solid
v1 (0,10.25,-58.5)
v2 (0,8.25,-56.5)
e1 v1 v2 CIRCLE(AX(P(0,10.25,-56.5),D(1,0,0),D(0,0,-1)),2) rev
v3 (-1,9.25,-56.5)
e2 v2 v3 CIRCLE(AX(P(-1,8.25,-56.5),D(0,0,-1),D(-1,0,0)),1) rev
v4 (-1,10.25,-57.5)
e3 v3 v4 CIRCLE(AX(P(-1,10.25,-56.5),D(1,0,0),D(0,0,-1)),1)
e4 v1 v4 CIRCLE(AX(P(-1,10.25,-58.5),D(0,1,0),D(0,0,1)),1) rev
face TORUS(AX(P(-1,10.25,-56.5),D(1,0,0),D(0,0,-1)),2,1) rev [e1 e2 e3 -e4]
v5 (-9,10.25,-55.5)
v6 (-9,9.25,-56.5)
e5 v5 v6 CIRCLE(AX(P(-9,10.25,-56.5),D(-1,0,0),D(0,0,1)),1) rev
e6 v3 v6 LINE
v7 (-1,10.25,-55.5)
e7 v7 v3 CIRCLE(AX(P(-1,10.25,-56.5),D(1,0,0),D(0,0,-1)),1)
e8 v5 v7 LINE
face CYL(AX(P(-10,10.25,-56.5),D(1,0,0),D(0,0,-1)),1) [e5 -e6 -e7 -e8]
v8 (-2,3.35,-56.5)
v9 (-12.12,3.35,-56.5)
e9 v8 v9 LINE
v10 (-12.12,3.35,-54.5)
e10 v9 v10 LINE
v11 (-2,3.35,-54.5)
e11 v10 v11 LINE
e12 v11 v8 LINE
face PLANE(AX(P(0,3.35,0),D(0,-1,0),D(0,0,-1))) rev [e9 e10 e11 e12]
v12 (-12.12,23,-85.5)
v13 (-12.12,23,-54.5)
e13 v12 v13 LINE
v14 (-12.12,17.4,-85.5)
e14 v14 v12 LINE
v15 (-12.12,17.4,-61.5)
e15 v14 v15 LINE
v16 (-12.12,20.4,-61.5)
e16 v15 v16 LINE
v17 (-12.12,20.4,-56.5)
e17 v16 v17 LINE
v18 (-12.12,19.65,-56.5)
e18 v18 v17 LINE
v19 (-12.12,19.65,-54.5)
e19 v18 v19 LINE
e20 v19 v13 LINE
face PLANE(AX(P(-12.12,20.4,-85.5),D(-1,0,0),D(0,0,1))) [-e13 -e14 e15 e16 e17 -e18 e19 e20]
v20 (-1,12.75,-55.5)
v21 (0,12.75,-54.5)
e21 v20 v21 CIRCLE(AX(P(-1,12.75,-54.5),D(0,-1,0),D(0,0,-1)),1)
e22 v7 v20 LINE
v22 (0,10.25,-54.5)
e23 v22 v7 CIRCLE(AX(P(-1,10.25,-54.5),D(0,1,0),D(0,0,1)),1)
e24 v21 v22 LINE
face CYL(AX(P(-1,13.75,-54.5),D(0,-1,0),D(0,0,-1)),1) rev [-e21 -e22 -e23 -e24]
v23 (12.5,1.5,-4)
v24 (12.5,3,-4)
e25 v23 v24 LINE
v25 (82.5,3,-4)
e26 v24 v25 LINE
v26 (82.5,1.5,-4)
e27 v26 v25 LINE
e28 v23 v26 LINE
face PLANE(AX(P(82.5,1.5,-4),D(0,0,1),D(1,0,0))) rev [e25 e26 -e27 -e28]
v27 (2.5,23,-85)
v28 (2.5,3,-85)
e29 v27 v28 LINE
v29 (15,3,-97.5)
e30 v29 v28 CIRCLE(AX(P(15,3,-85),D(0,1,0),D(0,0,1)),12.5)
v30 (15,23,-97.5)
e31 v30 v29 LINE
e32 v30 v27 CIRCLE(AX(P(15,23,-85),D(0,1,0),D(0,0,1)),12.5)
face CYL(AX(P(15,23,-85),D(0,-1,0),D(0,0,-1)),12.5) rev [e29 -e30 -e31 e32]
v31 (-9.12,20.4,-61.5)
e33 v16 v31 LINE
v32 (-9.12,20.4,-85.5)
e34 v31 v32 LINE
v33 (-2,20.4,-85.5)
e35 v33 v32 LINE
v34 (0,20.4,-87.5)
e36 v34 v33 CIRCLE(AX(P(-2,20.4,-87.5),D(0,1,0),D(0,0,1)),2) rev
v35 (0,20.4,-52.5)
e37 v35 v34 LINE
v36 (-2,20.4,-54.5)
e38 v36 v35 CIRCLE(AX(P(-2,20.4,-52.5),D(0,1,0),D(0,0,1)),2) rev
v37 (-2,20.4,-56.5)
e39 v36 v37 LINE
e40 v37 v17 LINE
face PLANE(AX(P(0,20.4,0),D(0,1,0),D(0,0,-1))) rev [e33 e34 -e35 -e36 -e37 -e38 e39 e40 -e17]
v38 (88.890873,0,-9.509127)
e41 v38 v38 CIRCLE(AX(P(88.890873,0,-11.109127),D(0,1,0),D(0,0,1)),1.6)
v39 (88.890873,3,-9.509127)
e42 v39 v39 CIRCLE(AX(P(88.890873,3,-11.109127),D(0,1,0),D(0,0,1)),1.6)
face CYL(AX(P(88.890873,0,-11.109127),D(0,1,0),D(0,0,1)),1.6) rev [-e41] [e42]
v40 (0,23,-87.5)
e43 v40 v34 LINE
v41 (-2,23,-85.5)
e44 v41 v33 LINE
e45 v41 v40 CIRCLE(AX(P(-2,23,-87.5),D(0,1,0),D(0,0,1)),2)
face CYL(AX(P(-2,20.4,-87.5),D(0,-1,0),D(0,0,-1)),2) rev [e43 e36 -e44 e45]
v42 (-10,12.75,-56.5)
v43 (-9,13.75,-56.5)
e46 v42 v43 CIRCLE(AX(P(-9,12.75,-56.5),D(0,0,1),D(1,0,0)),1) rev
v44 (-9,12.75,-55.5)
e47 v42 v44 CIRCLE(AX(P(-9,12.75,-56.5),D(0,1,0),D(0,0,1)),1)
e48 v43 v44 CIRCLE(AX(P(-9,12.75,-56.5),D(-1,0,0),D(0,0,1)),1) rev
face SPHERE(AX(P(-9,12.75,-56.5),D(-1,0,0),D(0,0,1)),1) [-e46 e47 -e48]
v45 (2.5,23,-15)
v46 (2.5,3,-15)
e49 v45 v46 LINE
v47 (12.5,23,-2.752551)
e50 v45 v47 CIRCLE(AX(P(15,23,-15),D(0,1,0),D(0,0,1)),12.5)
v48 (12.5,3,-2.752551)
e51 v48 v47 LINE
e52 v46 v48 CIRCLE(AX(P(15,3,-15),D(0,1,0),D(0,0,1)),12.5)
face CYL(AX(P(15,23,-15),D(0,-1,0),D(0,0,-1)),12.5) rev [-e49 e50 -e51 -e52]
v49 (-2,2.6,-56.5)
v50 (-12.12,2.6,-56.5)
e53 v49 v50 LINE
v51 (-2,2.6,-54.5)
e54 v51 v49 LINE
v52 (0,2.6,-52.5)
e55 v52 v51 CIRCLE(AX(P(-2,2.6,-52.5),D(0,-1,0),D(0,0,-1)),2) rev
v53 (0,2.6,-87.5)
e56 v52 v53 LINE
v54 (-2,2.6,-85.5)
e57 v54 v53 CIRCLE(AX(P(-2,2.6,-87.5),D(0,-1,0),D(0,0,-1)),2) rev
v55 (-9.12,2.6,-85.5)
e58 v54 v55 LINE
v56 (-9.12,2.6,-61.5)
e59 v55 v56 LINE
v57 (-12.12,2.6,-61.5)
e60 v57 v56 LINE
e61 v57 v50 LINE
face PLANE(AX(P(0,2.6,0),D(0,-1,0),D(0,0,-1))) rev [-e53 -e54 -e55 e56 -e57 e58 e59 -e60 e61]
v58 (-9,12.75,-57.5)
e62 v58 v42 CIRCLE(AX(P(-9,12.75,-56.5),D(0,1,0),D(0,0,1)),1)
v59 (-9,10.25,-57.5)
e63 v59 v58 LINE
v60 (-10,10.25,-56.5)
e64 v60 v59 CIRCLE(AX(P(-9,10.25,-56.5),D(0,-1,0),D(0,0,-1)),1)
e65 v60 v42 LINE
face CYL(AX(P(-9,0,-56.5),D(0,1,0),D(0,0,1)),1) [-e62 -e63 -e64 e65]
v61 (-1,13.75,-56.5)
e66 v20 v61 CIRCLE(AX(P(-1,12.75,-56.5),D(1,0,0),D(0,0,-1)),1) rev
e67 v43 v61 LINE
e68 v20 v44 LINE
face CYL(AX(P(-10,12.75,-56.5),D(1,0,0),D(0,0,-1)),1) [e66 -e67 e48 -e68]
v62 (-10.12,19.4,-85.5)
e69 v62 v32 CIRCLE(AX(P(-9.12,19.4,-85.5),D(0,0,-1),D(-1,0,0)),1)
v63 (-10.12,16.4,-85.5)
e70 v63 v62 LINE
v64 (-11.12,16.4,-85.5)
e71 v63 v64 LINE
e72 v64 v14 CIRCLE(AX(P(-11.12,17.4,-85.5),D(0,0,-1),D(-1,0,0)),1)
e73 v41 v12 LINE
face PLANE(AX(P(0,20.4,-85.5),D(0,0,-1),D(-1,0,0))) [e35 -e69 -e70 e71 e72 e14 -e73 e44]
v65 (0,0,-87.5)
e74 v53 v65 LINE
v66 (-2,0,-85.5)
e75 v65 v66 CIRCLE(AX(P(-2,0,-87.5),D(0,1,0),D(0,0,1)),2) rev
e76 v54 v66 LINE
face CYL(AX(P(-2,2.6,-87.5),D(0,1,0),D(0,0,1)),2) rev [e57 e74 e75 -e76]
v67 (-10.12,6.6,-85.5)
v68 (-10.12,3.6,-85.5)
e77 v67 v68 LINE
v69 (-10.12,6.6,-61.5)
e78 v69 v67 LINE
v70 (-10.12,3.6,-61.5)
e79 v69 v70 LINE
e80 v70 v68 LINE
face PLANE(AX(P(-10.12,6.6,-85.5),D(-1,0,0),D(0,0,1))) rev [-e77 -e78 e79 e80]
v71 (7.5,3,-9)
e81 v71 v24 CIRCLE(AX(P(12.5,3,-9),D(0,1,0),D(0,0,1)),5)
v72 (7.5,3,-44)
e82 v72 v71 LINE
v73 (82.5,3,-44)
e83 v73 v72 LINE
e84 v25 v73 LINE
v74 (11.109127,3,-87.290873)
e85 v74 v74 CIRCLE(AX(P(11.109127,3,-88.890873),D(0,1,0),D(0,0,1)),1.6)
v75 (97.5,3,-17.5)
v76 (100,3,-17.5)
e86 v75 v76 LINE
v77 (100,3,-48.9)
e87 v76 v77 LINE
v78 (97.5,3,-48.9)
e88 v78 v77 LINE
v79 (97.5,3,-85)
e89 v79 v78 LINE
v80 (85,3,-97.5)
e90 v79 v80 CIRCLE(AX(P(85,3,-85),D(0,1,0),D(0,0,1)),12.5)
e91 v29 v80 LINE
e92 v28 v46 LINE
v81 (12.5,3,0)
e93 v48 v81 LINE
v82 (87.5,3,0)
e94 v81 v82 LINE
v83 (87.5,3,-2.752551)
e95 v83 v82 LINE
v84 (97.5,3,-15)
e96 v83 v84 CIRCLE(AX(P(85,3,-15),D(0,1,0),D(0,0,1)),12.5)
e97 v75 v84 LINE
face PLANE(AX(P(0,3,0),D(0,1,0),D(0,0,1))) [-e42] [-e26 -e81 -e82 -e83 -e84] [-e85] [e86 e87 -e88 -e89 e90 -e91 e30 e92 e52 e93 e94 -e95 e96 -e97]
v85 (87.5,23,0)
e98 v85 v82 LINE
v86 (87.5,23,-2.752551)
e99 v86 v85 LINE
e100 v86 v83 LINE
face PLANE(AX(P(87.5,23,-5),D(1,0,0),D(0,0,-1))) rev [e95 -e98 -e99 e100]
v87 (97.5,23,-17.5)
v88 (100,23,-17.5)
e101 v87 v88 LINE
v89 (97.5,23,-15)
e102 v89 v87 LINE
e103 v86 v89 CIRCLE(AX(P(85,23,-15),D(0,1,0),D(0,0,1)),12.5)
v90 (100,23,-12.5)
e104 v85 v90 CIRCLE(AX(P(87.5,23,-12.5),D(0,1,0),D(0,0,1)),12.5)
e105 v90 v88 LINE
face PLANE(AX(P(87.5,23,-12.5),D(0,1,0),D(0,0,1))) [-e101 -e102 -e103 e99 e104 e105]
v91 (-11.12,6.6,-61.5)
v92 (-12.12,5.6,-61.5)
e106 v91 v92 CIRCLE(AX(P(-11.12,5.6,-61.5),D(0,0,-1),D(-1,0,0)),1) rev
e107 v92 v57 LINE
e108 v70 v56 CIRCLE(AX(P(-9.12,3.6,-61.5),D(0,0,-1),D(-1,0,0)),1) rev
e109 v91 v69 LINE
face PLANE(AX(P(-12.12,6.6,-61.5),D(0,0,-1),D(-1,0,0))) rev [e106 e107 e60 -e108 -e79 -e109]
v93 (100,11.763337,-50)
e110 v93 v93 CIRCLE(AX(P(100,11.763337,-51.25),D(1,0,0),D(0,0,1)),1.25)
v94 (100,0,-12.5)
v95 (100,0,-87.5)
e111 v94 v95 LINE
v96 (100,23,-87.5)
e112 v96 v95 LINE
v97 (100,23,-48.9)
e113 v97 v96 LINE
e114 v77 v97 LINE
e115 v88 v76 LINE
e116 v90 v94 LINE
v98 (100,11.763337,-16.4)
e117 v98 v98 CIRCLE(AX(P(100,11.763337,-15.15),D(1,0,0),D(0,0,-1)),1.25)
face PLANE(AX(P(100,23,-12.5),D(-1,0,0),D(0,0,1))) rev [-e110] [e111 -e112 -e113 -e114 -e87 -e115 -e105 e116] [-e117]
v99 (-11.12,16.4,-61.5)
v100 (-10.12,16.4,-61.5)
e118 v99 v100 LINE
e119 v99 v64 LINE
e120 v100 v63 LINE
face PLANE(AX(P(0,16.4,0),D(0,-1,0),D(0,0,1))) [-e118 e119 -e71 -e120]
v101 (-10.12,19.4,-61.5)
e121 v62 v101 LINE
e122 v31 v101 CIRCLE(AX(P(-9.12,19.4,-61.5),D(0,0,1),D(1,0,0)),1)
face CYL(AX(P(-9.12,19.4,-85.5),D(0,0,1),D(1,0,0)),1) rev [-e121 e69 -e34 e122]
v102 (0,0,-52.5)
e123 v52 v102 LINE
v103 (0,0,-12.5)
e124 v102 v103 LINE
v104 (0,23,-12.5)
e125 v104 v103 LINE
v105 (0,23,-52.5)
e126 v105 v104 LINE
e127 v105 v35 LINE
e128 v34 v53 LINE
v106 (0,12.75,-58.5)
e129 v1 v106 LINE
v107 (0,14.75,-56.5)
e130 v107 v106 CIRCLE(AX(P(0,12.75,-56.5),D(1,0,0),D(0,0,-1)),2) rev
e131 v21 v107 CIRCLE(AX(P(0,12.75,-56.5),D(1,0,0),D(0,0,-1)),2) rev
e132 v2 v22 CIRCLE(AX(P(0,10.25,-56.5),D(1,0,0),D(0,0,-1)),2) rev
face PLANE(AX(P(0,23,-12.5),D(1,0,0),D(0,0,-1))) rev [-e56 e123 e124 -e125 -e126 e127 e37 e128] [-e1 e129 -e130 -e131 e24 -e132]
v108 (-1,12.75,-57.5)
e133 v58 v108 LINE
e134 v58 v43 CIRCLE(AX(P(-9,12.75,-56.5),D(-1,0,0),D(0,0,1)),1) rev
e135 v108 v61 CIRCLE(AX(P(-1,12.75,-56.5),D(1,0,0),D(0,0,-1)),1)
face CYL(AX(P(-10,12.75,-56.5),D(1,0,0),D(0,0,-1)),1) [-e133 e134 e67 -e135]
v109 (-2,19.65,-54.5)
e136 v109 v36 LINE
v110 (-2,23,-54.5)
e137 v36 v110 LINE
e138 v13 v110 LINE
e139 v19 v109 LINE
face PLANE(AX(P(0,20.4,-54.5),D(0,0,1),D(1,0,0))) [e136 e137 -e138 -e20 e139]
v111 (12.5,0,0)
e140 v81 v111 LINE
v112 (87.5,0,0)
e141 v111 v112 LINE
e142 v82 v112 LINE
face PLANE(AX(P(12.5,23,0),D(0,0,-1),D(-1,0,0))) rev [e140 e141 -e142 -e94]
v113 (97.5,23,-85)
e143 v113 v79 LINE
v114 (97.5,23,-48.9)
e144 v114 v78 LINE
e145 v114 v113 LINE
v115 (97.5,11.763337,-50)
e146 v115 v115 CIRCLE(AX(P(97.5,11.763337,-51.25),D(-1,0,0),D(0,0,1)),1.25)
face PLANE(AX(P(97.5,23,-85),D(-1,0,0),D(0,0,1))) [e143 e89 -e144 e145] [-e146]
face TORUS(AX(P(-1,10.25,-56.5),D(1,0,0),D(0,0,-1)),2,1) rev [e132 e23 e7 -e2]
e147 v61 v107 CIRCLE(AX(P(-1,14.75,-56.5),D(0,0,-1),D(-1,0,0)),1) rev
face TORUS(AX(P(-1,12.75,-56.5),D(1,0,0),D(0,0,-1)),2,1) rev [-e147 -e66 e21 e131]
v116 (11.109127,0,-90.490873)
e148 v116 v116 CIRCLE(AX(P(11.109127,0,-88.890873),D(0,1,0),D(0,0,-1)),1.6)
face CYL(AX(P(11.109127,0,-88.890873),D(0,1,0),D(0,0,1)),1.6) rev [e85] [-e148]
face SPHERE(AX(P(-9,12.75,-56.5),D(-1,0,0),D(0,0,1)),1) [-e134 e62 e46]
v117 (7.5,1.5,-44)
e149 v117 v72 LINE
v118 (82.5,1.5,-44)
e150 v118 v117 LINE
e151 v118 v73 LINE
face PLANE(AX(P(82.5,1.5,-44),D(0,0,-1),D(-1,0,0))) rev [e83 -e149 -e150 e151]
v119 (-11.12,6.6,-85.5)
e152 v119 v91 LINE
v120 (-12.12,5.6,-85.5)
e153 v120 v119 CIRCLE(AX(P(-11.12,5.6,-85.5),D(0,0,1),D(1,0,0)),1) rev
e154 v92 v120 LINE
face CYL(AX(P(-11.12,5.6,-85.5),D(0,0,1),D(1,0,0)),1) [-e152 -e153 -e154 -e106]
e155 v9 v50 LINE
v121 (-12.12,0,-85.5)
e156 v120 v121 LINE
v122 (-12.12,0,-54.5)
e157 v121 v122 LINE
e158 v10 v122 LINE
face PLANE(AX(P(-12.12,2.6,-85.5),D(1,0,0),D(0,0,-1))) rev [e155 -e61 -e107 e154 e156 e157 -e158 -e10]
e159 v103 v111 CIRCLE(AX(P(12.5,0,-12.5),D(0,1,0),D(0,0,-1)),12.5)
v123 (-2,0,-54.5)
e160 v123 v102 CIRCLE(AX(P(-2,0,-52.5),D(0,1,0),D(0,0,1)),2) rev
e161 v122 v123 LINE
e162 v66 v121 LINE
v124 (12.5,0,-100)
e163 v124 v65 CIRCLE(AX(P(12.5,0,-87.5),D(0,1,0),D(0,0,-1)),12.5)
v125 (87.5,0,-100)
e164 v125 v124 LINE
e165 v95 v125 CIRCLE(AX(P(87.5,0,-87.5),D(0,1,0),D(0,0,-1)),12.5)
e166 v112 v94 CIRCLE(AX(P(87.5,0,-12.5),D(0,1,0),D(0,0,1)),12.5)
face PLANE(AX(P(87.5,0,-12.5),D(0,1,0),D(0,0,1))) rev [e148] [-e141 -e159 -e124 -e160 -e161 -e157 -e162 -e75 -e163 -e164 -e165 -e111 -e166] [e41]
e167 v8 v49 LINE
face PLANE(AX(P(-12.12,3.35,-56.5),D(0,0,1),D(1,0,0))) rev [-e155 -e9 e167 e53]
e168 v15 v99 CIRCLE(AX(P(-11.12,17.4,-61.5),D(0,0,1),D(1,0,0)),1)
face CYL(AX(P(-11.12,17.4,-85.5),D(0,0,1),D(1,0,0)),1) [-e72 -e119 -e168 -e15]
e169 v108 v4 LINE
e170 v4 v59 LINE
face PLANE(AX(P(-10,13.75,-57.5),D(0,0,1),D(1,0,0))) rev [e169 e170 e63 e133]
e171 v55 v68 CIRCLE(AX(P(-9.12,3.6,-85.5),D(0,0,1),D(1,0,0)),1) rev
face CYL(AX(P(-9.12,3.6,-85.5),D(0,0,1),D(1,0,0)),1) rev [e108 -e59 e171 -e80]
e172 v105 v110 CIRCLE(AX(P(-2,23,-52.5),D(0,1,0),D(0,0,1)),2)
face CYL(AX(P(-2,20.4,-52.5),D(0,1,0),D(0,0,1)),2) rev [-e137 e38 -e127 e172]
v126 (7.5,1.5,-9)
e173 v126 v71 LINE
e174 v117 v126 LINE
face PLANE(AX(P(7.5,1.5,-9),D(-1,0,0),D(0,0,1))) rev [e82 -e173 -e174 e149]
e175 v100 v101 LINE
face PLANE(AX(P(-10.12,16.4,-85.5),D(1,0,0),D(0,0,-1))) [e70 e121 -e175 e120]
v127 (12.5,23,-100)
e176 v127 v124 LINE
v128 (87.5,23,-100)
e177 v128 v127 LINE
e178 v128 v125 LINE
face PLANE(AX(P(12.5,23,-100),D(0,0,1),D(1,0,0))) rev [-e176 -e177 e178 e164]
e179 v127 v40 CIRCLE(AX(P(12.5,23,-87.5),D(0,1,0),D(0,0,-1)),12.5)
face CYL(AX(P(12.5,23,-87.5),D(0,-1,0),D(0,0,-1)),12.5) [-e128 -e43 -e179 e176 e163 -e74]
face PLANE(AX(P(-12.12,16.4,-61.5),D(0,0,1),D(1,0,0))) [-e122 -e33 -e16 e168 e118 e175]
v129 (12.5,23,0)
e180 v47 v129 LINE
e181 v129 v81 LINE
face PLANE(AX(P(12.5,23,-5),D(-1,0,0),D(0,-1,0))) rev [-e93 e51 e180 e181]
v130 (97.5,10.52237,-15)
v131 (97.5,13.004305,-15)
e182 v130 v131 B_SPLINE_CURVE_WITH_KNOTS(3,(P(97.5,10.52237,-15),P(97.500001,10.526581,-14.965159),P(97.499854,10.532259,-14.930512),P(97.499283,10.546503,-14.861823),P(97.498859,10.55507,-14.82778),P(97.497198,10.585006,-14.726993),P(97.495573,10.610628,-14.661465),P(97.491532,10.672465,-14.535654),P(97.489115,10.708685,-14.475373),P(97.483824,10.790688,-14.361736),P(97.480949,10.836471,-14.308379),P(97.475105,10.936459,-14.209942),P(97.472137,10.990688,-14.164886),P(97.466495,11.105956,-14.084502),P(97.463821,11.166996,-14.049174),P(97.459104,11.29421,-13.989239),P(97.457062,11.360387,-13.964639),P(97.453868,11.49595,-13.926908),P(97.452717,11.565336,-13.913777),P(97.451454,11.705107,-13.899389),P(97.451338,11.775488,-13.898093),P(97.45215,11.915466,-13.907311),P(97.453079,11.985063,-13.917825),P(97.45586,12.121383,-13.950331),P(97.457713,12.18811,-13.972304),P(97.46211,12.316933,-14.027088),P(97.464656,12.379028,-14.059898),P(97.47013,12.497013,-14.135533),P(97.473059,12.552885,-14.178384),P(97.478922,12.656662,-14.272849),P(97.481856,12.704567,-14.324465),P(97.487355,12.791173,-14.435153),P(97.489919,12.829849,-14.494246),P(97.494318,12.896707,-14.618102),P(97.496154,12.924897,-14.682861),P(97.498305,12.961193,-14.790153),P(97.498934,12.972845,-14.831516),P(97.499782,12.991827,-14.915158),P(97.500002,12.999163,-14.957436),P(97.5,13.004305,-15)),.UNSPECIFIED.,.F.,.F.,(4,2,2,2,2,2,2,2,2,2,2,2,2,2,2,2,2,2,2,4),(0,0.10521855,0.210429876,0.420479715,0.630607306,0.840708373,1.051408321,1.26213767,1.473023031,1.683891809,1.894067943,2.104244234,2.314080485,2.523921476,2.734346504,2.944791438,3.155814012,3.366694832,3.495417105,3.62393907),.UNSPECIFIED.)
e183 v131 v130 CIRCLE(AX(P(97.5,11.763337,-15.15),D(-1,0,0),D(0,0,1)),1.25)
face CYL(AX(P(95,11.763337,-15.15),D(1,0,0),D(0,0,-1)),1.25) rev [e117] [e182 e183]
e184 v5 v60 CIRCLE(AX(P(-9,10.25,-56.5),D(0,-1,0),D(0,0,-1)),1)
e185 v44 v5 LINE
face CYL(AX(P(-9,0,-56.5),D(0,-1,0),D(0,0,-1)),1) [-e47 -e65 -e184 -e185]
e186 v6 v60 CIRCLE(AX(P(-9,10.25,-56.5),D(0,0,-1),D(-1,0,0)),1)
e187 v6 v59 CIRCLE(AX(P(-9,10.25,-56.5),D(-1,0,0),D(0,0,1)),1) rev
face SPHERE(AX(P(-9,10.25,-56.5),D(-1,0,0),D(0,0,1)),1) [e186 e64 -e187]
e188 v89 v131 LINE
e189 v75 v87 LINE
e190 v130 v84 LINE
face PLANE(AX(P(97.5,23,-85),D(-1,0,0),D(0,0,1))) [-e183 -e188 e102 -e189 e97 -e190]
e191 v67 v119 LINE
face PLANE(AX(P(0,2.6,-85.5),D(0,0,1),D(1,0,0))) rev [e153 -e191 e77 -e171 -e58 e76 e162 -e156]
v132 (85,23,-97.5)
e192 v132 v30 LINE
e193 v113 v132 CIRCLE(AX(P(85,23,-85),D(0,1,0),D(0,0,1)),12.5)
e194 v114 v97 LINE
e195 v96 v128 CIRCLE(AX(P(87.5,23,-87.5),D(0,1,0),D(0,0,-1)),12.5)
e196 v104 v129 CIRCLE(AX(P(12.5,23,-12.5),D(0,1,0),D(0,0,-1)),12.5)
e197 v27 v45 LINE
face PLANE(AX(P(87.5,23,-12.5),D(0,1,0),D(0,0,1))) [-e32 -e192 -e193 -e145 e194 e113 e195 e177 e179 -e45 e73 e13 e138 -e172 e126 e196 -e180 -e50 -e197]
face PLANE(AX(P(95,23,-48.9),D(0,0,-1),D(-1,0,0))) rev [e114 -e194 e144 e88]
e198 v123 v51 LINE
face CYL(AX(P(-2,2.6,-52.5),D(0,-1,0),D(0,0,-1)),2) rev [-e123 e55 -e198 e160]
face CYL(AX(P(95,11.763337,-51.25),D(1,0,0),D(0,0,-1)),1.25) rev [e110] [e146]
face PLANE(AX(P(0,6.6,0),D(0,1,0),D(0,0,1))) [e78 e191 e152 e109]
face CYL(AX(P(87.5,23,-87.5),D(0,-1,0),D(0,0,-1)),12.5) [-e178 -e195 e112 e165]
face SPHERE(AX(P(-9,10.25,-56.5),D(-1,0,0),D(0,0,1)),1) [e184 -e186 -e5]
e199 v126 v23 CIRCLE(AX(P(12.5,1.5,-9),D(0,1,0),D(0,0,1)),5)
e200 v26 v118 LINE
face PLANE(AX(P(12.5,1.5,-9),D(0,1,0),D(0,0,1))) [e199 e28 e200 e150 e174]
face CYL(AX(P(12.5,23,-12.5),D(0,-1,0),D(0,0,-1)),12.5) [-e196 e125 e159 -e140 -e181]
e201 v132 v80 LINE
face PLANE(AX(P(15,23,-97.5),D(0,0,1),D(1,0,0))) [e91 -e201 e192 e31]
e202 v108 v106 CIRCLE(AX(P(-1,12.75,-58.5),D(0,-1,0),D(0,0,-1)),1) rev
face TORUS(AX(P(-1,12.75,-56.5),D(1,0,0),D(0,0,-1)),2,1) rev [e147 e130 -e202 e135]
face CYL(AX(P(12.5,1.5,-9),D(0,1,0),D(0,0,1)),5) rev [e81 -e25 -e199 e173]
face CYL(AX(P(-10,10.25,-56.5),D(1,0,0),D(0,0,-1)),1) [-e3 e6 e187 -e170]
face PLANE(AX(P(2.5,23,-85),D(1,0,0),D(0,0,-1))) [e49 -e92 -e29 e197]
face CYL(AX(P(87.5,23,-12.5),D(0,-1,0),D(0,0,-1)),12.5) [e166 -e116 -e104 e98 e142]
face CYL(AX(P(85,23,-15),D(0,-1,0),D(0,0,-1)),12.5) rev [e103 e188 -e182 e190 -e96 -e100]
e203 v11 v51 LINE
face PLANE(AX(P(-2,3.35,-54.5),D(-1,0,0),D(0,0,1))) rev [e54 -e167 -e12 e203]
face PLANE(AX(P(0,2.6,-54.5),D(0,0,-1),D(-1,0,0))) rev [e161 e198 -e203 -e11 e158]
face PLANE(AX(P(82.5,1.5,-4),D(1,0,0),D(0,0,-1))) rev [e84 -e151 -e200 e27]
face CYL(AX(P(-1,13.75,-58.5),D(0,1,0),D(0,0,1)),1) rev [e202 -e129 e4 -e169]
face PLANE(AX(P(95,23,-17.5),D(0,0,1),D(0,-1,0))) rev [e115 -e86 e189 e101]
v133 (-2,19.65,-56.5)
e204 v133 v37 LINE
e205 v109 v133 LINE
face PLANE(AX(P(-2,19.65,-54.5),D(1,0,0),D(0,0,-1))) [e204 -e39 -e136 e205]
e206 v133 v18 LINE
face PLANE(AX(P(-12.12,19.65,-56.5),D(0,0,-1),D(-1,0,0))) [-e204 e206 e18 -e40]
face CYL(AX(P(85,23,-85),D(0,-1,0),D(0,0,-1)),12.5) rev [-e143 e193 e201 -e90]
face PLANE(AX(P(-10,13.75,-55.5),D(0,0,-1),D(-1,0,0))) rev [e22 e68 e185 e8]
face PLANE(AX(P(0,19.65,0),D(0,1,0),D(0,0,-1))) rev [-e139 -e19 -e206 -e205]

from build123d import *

# Parameters (mm, degrees)
BOSS_EXTRUDE1_DEPTH     = 23
BOSS_EXTRUDE2_DEPTH     = 3
CUT_EXTRUDE1_DEPTH      = 143.828568571
CUT_EXTRUDE1_DEPTH_BACK = 143.828568571
SKETCH4_R               = 1.6
CUT_EXTRUDE2_DEPTH      = 1.5
SKETCH6_W               = 75
SKETCH6_H               = 20
CUT_EXTRUDE4_DEPTH      = 5
SKETCH8_R               = 1.25
SKETCH8_W               = 31.4
SKETCH8_H               = 20
CUT_EXTRUDE5_DEPTH      = 5
SKETCH9_W               = 2
SKETCH9_H               = 4.5
BOSS_EXTRUDE3_DEPTH     = 10
FILLET2_R               = 1
SKETCH10_W              = 12.12
SKETCH10_H              = 31
BOSS_EXTRUDE4_DEPTH     = 2.6
FILLET3_R               = 2
FILLET5_R               = 2
SKETCH11_W              = 2
SKETCH11_H              = 24
BOSS_EXTRUDE5_DEPTH     = 4
FILLET6_R               = 1
FILLET7_R               = 1
SKETCH12_W              = 10.12
SKETCH12_H              = 2
BOSS_EXTRUDE6_DEPTH     = 0.75
FILLET3_OF_MIRROR1_R    = 2
FILLET5_OF_MIRROR1_R    = 2
FILLET6_OF_MIRROR1_R    = 1
FILLET7_OF_MIRROR1_R    = 1


with BuildPart() as part:
    # Sketch1 → Boss-Extrude1 (new body)
    with BuildSketch(Plane(origin=(0, 0, 0), x_dir=(1, 0, 0), z_dir=(0, 1, 0))):
        with BuildLine():
            Line((12.5, 0), (87.5, 0))
            ThreePointArc((87.5, 0), (96.338834765, 3.661165235), (100, 12.5))
            Line((100, 12.5), (100, 87.5))
            ThreePointArc((100, 87.5), (96.338834765, 96.338834765), (87.5, 100))
            Line((87.5, 100), (12.5, 100))
            ThreePointArc((12.5, 100), (3.661165235, 96.338834765), (0, 87.5))
            Line((0, 87.5), (0, 12.5))
            ThreePointArc((0, 12.5), (3.661165235, 3.661165235), (12.5, 0))
        make_face()
        with BuildLine():
            Line((15, 97.5), (85, 97.5))
            ThreePointArc((85, 97.5), (93.838834765, 93.838834765), (97.5, 85))
            Line((97.5, 85), (97.5, 15))
            ThreePointArc((97.5, 15), (93.838834765, 6.161165235), (85, 2.5))
            Line((85, 2.5), (15, 2.5))
            ThreePointArc((15, 2.5), (6.161165235, 6.161165235), (2.5, 15))
            Line((2.5, 15), (2.5, 85))
            ThreePointArc((2.5, 85), (6.161165235, 93.838834765), (15, 97.5))
        make_face(mode=Mode.SUBTRACT)
    extrude(amount=BOSS_EXTRUDE1_DEPTH)

    # Sketch1<2> → Boss-Extrude2 (add)
    with BuildSketch(Plane(origin=(0, 0, 0), x_dir=(1, 0, 0), z_dir=(0, 1, 0))):
        with BuildLine():
            Line((15, 97.5), (85, 97.5))
            ThreePointArc((85, 97.5), (93.838834765, 93.838834765), (97.5, 85))
            Line((97.5, 85), (97.5, 15))
            ThreePointArc((97.5, 15), (93.838834765, 6.161165235), (85, 2.5))
            Line((85, 2.5), (15, 2.5))
            ThreePointArc((15, 2.5), (6.161165235, 6.161165235), (2.5, 15))
            Line((2.5, 15), (2.5, 85))
            ThreePointArc((2.5, 85), (6.161165235, 93.838834765), (15, 97.5))
        make_face()
    extrude(amount=BOSS_EXTRUDE2_DEPTH)

    # Sketch4 → Cut-Extrude1 (cut, two sides: drawn at the far end of the back side and taken through both)
    with BuildSketch(Plane(origin=(0, 3, 0), x_dir=(1, 0, 0), z_dir=(0, 1, 0)).offset(-CUT_EXTRUDE1_DEPTH_BACK)):
        with Locations(Location((88.890872965, 11.109127035, 0), (0, 0, 270))):
            Circle(SKETCH4_R)
        with Locations(Location((11.109127035, 88.890872965, 0), (0, 0, 270))):
            Circle(SKETCH4_R)
    extrude(amount=CUT_EXTRUDE1_DEPTH + CUT_EXTRUDE1_DEPTH_BACK, mode=Mode.SUBTRACT)

    # Sketch5 → Cut-Extrude2 (cut)
    with BuildSketch(Plane(origin=(0, 3, 0), x_dir=(1, 0, 0), z_dir=(0, 1, 0))):
        with BuildLine():
            Line((82.5, 4), (12.5, 4))
            ThreePointArc((12.5, 4), (8.964466094, 5.464466094), (7.5, 9))
            Line((7.5, 9), (7.5, 44))
            Line((7.5, 44), (82.5, 44))
            Line((82.5, 44), (82.5, 4))
        make_face()
    extrude(amount=-CUT_EXTRUDE2_DEPTH, mode=Mode.SUBTRACT)

    # Sketch6 → Cut-Extrude4 (cut)
    with BuildSketch(Plane.XY):
        with Locations((50, 13)):
            Rectangle(SKETCH6_W, SKETCH6_H)
    extrude(amount=-CUT_EXTRUDE4_DEPTH, mode=Mode.SUBTRACT)

    # Sketch8 → Cut-Extrude5 (cut)
    with BuildSketch(Plane(origin=(100, 0, 0), x_dir=(0, 0, -1), z_dir=(1, 0, 0))):
        with Locations((15.15, 11.76333723)):
            Circle(SKETCH8_R)
        with Locations(Location((51.25, 11.76333723, 0), (0, 0, 180))):
            Circle(SKETCH8_R)
        with Locations((33.2, 13)):
            Rectangle(SKETCH8_W, SKETCH8_H)
    extrude(amount=-CUT_EXTRUDE5_DEPTH, mode=Mode.SUBTRACT)

    # Sketch9 → Boss-Extrude3 (add)
    with BuildSketch(Plane.ZY):
        with Locations((-56.5, 11.5)):
            Rectangle(SKETCH9_W, SKETCH9_H)
    extrude(amount=BOSS_EXTRUDE3_DEPTH)

    # Fillet2
    fillet2_edges = [part.edges().sort_by_distance(p)[0] for p in [
        (0, 11.5, -57.5),
        (-5, 13.75, -57.5),
        (0, 9.25, -56.5),
        (-5, 9.25, -57.5),
        (0, 11.5, -55.5),
        (-5, 9.25, -55.5),
        (0, 13.75, -56.5),
        (-5, 13.75, -55.5),
        (-10, 11.5, -57.5),
        (-10, 9.25, -56.5),
        (-10, 11.5, -55.5),
        (-10, 13.75, -56.5),
    ]]
    fillet(fillet2_edges, radius=FILLET2_R - 0.0001)  # a hair under: the kernel refuses the full size

    # Sketch10 → Boss-Extrude4 (add)
    with BuildSketch(Plane(origin=(0, 0, 0), x_dir=(1, 0, 0), z_dir=(0, 1, 0))):
        with Locations((-6.06, 70)):
            Rectangle(SKETCH10_W, SKETCH10_H)
    boss_extrude4 = extrude(amount=BOSS_EXTRUDE4_DEPTH)

    # Fillet3
    fillet3_edges = [part.edges().sort_by_distance(p)[0] for p in [
        (0, 1.3, -54.5),
    ]]
    fillet(fillet3_edges, radius=FILLET3_R)

    # Fillet5
    fillet5_edges = [part.edges().sort_by_distance(p)[0] for p in [
        (0, 1.3, -85.5),
    ]]
    fillet(fillet5_edges, radius=FILLET5_R - 0.0001)  # a hair under: the kernel refuses the full size

    # Sketch11 → Boss-Extrude5 (add)
    with BuildSketch(Plane(origin=(0, 2.6, 0), x_dir=(1, 0, 0), z_dir=(0, 1, 0))):
        with Locations((-11.12, 73.5)):
            Rectangle(SKETCH11_W, SKETCH11_H)
    boss_extrude5 = extrude(amount=BOSS_EXTRUDE5_DEPTH)

    # Fillet6
    fillet6_edges = [part.edges().sort_by_distance(p)[0] for p in [
        (-12.12, 6.6, -73.5),
    ]]
    fillet(fillet6_edges, radius=FILLET6_R)

    # Fillet7
    fillet7_edges = [part.edges().sort_by_distance(p)[0] for p in [
        (-10.12, 2.6, -73.5),
    ]]
    fillet(fillet7_edges, radius=FILLET7_R)

    # Sketch12 → Boss-Extrude6 (add)
    with BuildSketch(Plane(origin=(0, 2.6, 0), x_dir=(1, 0, 0), z_dir=(0, 1, 0))):
        with Locations((-7.06, 55.5)):
            Rectangle(SKETCH12_W, SKETCH12_H)
    boss_extrude6 = extrude(amount=BOSS_EXTRUDE6_DEPTH)

    # Mirror1: Boss-Extrude4, Boss-Extrude5, Boss-Extrude6 across plane
    add(boss_extrude4.mirror(Plane.ZX.offset(11.5)))
    add(boss_extrude5.mirror(Plane.ZX.offset(11.5)))
    add(boss_extrude6.mirror(Plane.ZX.offset(11.5)))

    # Fillet3 of Mirror1
    fillet3_of_mirror1_edges = [part.edges().sort_by_distance(p)[0] for p in [
        (0, 21.7, -54.5),
    ]]
    fillet(fillet3_of_mirror1_edges, radius=FILLET3_OF_MIRROR1_R)

    # Fillet5 of Mirror1
    fillet5_of_mirror1_edges = [part.edges().sort_by_distance(p)[0] for p in [
        (0, 21.7, -85.5),
    ]]
    fillet(fillet5_of_mirror1_edges, radius=FILLET5_OF_MIRROR1_R - 0.0001)  # a hair under: the kernel refuses the full size

    # Fillet6 of Mirror1
    fillet6_of_mirror1_edges = [part.edges().sort_by_distance(p)[0] for p in [
        (-12.12, 16.4, -73.5),
    ]]
    fillet(fillet6_of_mirror1_edges, radius=FILLET6_OF_MIRROR1_R)

    # Fillet7 of Mirror1
    fillet7_of_mirror1_edges = [part.edges().sort_by_distance(p)[0] for p in [
        (-10.12, 20.4, -73.5),
    ]]
    fillet(fillet7_of_mirror1_edges, radius=FILLET7_OF_MIRROR1_R)


solid = part.part
